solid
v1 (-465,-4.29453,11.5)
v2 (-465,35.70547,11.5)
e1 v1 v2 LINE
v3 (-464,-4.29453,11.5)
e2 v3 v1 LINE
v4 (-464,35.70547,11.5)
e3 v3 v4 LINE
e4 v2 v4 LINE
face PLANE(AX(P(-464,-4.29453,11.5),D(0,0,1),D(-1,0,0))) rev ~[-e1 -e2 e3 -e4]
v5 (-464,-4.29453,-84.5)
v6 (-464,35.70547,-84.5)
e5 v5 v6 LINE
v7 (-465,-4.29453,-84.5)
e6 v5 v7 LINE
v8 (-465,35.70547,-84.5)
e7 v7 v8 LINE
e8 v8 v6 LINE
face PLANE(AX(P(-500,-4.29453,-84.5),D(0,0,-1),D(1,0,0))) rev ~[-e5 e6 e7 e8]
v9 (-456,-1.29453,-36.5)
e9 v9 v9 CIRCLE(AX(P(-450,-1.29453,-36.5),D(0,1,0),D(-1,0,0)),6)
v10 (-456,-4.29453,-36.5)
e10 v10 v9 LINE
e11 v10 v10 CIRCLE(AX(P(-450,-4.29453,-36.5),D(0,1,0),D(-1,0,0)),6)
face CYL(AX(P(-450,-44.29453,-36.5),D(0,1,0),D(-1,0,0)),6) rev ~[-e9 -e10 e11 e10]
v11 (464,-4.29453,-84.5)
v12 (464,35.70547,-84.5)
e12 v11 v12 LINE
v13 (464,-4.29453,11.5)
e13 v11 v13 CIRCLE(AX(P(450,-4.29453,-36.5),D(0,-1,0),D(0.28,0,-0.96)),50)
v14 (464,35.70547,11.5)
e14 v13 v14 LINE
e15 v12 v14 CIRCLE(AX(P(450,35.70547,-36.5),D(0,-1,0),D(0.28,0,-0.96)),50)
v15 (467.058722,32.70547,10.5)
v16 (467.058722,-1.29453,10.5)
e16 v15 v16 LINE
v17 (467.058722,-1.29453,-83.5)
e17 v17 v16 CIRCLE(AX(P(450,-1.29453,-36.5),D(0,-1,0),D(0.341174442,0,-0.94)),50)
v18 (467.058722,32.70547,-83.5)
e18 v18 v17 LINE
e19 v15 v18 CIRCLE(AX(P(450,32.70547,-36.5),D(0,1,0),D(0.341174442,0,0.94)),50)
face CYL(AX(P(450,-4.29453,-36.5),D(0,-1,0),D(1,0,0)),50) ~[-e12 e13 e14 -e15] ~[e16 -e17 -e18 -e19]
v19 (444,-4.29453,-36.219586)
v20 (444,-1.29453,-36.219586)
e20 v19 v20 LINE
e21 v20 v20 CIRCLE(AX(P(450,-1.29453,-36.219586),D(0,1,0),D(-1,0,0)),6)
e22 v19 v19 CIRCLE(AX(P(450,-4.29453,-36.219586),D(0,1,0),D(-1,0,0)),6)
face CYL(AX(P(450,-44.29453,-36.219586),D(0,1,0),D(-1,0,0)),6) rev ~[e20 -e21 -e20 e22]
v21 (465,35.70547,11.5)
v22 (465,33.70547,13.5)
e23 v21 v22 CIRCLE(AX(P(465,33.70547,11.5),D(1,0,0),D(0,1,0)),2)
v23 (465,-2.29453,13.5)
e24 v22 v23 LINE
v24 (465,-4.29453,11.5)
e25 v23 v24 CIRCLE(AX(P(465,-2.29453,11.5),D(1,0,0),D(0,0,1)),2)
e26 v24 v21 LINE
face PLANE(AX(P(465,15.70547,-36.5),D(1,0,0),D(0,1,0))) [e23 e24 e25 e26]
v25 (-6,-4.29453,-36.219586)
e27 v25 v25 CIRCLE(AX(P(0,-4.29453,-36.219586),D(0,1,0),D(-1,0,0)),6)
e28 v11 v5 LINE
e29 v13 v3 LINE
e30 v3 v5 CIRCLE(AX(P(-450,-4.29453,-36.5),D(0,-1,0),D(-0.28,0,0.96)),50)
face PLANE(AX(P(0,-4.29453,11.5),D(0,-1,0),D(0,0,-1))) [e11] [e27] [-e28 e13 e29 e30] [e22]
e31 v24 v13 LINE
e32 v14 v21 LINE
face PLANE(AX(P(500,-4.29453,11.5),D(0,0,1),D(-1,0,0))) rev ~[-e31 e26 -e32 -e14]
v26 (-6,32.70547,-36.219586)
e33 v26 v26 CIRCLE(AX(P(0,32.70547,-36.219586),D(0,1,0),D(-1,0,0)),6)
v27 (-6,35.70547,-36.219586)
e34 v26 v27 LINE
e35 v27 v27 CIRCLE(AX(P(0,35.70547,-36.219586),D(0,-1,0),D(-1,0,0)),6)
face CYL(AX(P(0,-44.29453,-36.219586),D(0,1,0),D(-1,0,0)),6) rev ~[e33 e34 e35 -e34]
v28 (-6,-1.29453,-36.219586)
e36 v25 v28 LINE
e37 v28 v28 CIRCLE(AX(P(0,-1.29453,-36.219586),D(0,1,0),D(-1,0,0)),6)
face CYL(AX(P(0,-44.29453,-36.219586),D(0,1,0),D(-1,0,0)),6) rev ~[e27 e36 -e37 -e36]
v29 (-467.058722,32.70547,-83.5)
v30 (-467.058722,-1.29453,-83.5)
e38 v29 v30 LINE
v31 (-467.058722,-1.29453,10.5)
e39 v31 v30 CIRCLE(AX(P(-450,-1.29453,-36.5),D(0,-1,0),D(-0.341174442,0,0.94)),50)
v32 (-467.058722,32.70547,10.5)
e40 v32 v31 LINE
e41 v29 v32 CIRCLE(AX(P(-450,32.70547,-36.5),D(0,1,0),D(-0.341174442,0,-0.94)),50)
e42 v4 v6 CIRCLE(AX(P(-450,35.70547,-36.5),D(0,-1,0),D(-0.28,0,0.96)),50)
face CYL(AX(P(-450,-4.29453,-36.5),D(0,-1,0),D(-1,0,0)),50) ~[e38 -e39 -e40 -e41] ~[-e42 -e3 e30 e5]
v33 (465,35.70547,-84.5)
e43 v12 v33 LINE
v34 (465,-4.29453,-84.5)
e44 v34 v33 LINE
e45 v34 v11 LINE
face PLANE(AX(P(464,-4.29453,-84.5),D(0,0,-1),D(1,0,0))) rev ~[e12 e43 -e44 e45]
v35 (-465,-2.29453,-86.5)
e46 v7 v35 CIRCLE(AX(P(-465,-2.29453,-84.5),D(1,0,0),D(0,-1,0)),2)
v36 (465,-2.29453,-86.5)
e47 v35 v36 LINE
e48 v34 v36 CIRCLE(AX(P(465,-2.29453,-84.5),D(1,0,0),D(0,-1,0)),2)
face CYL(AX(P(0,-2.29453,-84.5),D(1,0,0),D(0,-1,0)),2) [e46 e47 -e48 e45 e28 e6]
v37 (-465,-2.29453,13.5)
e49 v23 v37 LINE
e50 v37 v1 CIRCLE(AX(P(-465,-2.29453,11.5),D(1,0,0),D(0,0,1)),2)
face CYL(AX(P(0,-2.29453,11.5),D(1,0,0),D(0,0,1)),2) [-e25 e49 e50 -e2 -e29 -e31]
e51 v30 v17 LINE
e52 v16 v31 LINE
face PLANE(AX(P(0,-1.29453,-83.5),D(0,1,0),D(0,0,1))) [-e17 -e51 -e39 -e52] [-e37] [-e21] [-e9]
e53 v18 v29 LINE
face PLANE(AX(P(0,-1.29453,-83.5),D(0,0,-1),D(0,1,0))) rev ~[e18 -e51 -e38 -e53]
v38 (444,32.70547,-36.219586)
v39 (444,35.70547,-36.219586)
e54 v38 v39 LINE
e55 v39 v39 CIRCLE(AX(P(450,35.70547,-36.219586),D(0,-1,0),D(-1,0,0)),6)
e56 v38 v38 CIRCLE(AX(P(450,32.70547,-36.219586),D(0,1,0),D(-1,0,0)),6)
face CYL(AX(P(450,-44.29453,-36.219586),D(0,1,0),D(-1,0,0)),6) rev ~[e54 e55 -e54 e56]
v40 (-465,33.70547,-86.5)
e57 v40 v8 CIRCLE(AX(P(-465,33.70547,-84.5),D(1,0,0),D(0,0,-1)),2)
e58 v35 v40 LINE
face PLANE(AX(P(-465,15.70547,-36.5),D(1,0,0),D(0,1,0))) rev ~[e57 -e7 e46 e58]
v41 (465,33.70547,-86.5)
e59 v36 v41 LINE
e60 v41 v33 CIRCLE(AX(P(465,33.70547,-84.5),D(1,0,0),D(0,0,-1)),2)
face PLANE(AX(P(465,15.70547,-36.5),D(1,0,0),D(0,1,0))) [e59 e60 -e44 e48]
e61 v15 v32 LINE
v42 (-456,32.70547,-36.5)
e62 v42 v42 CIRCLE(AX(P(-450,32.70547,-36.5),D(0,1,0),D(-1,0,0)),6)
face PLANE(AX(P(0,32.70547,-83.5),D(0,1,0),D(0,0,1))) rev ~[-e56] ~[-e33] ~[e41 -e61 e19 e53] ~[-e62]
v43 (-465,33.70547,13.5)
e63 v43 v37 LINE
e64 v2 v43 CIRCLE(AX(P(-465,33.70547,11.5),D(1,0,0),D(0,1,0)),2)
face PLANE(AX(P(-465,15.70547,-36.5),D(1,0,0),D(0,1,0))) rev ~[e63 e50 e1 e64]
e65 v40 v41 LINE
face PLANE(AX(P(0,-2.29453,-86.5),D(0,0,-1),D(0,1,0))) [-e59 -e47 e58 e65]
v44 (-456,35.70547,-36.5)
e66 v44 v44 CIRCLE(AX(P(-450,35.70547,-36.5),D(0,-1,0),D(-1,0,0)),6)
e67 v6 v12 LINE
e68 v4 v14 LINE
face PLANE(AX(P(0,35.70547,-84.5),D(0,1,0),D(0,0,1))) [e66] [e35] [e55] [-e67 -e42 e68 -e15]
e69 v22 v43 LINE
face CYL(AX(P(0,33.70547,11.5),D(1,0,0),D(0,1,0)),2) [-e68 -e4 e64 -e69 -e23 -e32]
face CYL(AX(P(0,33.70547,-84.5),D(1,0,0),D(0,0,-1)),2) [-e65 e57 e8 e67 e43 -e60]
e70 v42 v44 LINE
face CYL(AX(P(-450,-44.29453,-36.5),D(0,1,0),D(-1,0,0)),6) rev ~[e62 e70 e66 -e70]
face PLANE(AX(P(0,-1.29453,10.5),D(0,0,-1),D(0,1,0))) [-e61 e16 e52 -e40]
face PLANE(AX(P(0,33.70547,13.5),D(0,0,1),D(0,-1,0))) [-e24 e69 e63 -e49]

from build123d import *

# Parameters (mm, degrees)
F3_W     = 34
F3_H     = 94
F4_DEPTH = 500
F6_D     = 12
F6_DEPTH = 40
F6_TIP   = 3.6051637142
F7_DEPTH = 40
F8_DEPTH = 35
F9_DEPTH = 35


# Not quite as in the source:
# - a feature names something its author has since deleted; it is built from what else it names


with BuildPart() as f4:
    # F3 (on Right) → F4 (new body, symmetric)
    with BuildSketch(Plane.YZ):
        with BuildLine():
            ThreePointArc((-4.2945303673, -84.5), (-3.7087439297, -85.9142135624), (-2.2945303673, -86.5))
            Line((-2.2945303673, -86.5), (33.7054696327, -86.5))
            ThreePointArc((33.7054696327, -86.5), (35.1196831951, -85.9142135624), (35.7054696327, -84.5))
            Line((35.7054696327, -84.5), (35.7054696327, 11.5))
            ThreePointArc((35.7054696327, 11.5), (35.1196831951, 12.9142135624), (33.7054696327, 13.5))
            Line((33.7054696327, 13.5), (-2.2945303673, 13.5))
            ThreePointArc((-2.2945303673, 13.5), (-3.7087439297, 12.9142135624), (-4.2945303673, 11.5))
            Line((-4.2945303673, 11.5), (-4.2945303673, -84.5))
        make_face()
        with Locations((15.7054696327, -36.5)):
            Rectangle(F3_W, F3_H, mode=Mode.SUBTRACT)
    extrude(amount=F4_DEPTH, both=True)

    # F6
    with Locations(Plane.XZ.offset(4.2945303673)):
        with Locations((450, -36.2195856869), (0, -36.2195856869), (-450, -36.5)):
            Hole(F6_D / 2, depth=F6_DEPTH)
            with Locations((0, 0, -(F6_DEPTH + F6_TIP / 2))):  # 118° drill point
                Cone(0, F6_D / 2, F6_TIP, mode=Mode.SUBTRACT)

    # F5 (on face) → F7 (cut)
    with BuildSketch(Plane.XZ.offset(4.2945303673)):
        with BuildLine():
            ThreePointArc((-500, -36.5), (-490, -6.5), (-464, 11.5))
            Line((-464, 11.5), (-500, 11.5))
            Line((-500, 11.5), (-500, -36.5))
        make_face()
        with BuildLine():
            ThreePointArc((-464, -84.5), (-490, -66.5), (-500, -36.5))
            Line((-500, -36.5), (-500, -84.5))
            Line((-500, -84.5), (-464, -84.5))
        make_face()
        with BuildLine():
            Line((500, 11.5), (464, 11.5))
            ThreePointArc((464, 11.5), (490, -6.5), (500, -36.5))
            Line((500, -36.5), (500, 11.5))
        make_face()
        with BuildLine():
            Line((500, -84.5), (500, -36.5))
            ThreePointArc((500, -36.5), (490, -66.5), (464, -84.5))
            Line((464, -84.5), (500, -84.5))
        make_face()
    extrude(amount=-F7_DEPTH, mode=Mode.SUBTRACT)

    # F8 (cut): faces of the model
    f8_faces = [f4.faces().sort_by_distance(p)[0] for p in [
        (-500, 15.7054696327, 12.4878664624),
        (-500, 15.7054696327, -85.4878664624),
    ]]
    extrude(f8_faces, amount=-F8_DEPTH, mode=Mode.SUBTRACT)

    # F9 (cut): faces of the model
    f9_faces = [f4.faces().sort_by_distance(p)[0] for p in [
        (500, 15.7054696327, -85.4878664624),
        (500, 15.7054696327, 12.4878664624),
    ]]
    extrude(f9_faces, amount=-F9_DEPTH, mode=Mode.SUBTRACT)


solid = f4.part
